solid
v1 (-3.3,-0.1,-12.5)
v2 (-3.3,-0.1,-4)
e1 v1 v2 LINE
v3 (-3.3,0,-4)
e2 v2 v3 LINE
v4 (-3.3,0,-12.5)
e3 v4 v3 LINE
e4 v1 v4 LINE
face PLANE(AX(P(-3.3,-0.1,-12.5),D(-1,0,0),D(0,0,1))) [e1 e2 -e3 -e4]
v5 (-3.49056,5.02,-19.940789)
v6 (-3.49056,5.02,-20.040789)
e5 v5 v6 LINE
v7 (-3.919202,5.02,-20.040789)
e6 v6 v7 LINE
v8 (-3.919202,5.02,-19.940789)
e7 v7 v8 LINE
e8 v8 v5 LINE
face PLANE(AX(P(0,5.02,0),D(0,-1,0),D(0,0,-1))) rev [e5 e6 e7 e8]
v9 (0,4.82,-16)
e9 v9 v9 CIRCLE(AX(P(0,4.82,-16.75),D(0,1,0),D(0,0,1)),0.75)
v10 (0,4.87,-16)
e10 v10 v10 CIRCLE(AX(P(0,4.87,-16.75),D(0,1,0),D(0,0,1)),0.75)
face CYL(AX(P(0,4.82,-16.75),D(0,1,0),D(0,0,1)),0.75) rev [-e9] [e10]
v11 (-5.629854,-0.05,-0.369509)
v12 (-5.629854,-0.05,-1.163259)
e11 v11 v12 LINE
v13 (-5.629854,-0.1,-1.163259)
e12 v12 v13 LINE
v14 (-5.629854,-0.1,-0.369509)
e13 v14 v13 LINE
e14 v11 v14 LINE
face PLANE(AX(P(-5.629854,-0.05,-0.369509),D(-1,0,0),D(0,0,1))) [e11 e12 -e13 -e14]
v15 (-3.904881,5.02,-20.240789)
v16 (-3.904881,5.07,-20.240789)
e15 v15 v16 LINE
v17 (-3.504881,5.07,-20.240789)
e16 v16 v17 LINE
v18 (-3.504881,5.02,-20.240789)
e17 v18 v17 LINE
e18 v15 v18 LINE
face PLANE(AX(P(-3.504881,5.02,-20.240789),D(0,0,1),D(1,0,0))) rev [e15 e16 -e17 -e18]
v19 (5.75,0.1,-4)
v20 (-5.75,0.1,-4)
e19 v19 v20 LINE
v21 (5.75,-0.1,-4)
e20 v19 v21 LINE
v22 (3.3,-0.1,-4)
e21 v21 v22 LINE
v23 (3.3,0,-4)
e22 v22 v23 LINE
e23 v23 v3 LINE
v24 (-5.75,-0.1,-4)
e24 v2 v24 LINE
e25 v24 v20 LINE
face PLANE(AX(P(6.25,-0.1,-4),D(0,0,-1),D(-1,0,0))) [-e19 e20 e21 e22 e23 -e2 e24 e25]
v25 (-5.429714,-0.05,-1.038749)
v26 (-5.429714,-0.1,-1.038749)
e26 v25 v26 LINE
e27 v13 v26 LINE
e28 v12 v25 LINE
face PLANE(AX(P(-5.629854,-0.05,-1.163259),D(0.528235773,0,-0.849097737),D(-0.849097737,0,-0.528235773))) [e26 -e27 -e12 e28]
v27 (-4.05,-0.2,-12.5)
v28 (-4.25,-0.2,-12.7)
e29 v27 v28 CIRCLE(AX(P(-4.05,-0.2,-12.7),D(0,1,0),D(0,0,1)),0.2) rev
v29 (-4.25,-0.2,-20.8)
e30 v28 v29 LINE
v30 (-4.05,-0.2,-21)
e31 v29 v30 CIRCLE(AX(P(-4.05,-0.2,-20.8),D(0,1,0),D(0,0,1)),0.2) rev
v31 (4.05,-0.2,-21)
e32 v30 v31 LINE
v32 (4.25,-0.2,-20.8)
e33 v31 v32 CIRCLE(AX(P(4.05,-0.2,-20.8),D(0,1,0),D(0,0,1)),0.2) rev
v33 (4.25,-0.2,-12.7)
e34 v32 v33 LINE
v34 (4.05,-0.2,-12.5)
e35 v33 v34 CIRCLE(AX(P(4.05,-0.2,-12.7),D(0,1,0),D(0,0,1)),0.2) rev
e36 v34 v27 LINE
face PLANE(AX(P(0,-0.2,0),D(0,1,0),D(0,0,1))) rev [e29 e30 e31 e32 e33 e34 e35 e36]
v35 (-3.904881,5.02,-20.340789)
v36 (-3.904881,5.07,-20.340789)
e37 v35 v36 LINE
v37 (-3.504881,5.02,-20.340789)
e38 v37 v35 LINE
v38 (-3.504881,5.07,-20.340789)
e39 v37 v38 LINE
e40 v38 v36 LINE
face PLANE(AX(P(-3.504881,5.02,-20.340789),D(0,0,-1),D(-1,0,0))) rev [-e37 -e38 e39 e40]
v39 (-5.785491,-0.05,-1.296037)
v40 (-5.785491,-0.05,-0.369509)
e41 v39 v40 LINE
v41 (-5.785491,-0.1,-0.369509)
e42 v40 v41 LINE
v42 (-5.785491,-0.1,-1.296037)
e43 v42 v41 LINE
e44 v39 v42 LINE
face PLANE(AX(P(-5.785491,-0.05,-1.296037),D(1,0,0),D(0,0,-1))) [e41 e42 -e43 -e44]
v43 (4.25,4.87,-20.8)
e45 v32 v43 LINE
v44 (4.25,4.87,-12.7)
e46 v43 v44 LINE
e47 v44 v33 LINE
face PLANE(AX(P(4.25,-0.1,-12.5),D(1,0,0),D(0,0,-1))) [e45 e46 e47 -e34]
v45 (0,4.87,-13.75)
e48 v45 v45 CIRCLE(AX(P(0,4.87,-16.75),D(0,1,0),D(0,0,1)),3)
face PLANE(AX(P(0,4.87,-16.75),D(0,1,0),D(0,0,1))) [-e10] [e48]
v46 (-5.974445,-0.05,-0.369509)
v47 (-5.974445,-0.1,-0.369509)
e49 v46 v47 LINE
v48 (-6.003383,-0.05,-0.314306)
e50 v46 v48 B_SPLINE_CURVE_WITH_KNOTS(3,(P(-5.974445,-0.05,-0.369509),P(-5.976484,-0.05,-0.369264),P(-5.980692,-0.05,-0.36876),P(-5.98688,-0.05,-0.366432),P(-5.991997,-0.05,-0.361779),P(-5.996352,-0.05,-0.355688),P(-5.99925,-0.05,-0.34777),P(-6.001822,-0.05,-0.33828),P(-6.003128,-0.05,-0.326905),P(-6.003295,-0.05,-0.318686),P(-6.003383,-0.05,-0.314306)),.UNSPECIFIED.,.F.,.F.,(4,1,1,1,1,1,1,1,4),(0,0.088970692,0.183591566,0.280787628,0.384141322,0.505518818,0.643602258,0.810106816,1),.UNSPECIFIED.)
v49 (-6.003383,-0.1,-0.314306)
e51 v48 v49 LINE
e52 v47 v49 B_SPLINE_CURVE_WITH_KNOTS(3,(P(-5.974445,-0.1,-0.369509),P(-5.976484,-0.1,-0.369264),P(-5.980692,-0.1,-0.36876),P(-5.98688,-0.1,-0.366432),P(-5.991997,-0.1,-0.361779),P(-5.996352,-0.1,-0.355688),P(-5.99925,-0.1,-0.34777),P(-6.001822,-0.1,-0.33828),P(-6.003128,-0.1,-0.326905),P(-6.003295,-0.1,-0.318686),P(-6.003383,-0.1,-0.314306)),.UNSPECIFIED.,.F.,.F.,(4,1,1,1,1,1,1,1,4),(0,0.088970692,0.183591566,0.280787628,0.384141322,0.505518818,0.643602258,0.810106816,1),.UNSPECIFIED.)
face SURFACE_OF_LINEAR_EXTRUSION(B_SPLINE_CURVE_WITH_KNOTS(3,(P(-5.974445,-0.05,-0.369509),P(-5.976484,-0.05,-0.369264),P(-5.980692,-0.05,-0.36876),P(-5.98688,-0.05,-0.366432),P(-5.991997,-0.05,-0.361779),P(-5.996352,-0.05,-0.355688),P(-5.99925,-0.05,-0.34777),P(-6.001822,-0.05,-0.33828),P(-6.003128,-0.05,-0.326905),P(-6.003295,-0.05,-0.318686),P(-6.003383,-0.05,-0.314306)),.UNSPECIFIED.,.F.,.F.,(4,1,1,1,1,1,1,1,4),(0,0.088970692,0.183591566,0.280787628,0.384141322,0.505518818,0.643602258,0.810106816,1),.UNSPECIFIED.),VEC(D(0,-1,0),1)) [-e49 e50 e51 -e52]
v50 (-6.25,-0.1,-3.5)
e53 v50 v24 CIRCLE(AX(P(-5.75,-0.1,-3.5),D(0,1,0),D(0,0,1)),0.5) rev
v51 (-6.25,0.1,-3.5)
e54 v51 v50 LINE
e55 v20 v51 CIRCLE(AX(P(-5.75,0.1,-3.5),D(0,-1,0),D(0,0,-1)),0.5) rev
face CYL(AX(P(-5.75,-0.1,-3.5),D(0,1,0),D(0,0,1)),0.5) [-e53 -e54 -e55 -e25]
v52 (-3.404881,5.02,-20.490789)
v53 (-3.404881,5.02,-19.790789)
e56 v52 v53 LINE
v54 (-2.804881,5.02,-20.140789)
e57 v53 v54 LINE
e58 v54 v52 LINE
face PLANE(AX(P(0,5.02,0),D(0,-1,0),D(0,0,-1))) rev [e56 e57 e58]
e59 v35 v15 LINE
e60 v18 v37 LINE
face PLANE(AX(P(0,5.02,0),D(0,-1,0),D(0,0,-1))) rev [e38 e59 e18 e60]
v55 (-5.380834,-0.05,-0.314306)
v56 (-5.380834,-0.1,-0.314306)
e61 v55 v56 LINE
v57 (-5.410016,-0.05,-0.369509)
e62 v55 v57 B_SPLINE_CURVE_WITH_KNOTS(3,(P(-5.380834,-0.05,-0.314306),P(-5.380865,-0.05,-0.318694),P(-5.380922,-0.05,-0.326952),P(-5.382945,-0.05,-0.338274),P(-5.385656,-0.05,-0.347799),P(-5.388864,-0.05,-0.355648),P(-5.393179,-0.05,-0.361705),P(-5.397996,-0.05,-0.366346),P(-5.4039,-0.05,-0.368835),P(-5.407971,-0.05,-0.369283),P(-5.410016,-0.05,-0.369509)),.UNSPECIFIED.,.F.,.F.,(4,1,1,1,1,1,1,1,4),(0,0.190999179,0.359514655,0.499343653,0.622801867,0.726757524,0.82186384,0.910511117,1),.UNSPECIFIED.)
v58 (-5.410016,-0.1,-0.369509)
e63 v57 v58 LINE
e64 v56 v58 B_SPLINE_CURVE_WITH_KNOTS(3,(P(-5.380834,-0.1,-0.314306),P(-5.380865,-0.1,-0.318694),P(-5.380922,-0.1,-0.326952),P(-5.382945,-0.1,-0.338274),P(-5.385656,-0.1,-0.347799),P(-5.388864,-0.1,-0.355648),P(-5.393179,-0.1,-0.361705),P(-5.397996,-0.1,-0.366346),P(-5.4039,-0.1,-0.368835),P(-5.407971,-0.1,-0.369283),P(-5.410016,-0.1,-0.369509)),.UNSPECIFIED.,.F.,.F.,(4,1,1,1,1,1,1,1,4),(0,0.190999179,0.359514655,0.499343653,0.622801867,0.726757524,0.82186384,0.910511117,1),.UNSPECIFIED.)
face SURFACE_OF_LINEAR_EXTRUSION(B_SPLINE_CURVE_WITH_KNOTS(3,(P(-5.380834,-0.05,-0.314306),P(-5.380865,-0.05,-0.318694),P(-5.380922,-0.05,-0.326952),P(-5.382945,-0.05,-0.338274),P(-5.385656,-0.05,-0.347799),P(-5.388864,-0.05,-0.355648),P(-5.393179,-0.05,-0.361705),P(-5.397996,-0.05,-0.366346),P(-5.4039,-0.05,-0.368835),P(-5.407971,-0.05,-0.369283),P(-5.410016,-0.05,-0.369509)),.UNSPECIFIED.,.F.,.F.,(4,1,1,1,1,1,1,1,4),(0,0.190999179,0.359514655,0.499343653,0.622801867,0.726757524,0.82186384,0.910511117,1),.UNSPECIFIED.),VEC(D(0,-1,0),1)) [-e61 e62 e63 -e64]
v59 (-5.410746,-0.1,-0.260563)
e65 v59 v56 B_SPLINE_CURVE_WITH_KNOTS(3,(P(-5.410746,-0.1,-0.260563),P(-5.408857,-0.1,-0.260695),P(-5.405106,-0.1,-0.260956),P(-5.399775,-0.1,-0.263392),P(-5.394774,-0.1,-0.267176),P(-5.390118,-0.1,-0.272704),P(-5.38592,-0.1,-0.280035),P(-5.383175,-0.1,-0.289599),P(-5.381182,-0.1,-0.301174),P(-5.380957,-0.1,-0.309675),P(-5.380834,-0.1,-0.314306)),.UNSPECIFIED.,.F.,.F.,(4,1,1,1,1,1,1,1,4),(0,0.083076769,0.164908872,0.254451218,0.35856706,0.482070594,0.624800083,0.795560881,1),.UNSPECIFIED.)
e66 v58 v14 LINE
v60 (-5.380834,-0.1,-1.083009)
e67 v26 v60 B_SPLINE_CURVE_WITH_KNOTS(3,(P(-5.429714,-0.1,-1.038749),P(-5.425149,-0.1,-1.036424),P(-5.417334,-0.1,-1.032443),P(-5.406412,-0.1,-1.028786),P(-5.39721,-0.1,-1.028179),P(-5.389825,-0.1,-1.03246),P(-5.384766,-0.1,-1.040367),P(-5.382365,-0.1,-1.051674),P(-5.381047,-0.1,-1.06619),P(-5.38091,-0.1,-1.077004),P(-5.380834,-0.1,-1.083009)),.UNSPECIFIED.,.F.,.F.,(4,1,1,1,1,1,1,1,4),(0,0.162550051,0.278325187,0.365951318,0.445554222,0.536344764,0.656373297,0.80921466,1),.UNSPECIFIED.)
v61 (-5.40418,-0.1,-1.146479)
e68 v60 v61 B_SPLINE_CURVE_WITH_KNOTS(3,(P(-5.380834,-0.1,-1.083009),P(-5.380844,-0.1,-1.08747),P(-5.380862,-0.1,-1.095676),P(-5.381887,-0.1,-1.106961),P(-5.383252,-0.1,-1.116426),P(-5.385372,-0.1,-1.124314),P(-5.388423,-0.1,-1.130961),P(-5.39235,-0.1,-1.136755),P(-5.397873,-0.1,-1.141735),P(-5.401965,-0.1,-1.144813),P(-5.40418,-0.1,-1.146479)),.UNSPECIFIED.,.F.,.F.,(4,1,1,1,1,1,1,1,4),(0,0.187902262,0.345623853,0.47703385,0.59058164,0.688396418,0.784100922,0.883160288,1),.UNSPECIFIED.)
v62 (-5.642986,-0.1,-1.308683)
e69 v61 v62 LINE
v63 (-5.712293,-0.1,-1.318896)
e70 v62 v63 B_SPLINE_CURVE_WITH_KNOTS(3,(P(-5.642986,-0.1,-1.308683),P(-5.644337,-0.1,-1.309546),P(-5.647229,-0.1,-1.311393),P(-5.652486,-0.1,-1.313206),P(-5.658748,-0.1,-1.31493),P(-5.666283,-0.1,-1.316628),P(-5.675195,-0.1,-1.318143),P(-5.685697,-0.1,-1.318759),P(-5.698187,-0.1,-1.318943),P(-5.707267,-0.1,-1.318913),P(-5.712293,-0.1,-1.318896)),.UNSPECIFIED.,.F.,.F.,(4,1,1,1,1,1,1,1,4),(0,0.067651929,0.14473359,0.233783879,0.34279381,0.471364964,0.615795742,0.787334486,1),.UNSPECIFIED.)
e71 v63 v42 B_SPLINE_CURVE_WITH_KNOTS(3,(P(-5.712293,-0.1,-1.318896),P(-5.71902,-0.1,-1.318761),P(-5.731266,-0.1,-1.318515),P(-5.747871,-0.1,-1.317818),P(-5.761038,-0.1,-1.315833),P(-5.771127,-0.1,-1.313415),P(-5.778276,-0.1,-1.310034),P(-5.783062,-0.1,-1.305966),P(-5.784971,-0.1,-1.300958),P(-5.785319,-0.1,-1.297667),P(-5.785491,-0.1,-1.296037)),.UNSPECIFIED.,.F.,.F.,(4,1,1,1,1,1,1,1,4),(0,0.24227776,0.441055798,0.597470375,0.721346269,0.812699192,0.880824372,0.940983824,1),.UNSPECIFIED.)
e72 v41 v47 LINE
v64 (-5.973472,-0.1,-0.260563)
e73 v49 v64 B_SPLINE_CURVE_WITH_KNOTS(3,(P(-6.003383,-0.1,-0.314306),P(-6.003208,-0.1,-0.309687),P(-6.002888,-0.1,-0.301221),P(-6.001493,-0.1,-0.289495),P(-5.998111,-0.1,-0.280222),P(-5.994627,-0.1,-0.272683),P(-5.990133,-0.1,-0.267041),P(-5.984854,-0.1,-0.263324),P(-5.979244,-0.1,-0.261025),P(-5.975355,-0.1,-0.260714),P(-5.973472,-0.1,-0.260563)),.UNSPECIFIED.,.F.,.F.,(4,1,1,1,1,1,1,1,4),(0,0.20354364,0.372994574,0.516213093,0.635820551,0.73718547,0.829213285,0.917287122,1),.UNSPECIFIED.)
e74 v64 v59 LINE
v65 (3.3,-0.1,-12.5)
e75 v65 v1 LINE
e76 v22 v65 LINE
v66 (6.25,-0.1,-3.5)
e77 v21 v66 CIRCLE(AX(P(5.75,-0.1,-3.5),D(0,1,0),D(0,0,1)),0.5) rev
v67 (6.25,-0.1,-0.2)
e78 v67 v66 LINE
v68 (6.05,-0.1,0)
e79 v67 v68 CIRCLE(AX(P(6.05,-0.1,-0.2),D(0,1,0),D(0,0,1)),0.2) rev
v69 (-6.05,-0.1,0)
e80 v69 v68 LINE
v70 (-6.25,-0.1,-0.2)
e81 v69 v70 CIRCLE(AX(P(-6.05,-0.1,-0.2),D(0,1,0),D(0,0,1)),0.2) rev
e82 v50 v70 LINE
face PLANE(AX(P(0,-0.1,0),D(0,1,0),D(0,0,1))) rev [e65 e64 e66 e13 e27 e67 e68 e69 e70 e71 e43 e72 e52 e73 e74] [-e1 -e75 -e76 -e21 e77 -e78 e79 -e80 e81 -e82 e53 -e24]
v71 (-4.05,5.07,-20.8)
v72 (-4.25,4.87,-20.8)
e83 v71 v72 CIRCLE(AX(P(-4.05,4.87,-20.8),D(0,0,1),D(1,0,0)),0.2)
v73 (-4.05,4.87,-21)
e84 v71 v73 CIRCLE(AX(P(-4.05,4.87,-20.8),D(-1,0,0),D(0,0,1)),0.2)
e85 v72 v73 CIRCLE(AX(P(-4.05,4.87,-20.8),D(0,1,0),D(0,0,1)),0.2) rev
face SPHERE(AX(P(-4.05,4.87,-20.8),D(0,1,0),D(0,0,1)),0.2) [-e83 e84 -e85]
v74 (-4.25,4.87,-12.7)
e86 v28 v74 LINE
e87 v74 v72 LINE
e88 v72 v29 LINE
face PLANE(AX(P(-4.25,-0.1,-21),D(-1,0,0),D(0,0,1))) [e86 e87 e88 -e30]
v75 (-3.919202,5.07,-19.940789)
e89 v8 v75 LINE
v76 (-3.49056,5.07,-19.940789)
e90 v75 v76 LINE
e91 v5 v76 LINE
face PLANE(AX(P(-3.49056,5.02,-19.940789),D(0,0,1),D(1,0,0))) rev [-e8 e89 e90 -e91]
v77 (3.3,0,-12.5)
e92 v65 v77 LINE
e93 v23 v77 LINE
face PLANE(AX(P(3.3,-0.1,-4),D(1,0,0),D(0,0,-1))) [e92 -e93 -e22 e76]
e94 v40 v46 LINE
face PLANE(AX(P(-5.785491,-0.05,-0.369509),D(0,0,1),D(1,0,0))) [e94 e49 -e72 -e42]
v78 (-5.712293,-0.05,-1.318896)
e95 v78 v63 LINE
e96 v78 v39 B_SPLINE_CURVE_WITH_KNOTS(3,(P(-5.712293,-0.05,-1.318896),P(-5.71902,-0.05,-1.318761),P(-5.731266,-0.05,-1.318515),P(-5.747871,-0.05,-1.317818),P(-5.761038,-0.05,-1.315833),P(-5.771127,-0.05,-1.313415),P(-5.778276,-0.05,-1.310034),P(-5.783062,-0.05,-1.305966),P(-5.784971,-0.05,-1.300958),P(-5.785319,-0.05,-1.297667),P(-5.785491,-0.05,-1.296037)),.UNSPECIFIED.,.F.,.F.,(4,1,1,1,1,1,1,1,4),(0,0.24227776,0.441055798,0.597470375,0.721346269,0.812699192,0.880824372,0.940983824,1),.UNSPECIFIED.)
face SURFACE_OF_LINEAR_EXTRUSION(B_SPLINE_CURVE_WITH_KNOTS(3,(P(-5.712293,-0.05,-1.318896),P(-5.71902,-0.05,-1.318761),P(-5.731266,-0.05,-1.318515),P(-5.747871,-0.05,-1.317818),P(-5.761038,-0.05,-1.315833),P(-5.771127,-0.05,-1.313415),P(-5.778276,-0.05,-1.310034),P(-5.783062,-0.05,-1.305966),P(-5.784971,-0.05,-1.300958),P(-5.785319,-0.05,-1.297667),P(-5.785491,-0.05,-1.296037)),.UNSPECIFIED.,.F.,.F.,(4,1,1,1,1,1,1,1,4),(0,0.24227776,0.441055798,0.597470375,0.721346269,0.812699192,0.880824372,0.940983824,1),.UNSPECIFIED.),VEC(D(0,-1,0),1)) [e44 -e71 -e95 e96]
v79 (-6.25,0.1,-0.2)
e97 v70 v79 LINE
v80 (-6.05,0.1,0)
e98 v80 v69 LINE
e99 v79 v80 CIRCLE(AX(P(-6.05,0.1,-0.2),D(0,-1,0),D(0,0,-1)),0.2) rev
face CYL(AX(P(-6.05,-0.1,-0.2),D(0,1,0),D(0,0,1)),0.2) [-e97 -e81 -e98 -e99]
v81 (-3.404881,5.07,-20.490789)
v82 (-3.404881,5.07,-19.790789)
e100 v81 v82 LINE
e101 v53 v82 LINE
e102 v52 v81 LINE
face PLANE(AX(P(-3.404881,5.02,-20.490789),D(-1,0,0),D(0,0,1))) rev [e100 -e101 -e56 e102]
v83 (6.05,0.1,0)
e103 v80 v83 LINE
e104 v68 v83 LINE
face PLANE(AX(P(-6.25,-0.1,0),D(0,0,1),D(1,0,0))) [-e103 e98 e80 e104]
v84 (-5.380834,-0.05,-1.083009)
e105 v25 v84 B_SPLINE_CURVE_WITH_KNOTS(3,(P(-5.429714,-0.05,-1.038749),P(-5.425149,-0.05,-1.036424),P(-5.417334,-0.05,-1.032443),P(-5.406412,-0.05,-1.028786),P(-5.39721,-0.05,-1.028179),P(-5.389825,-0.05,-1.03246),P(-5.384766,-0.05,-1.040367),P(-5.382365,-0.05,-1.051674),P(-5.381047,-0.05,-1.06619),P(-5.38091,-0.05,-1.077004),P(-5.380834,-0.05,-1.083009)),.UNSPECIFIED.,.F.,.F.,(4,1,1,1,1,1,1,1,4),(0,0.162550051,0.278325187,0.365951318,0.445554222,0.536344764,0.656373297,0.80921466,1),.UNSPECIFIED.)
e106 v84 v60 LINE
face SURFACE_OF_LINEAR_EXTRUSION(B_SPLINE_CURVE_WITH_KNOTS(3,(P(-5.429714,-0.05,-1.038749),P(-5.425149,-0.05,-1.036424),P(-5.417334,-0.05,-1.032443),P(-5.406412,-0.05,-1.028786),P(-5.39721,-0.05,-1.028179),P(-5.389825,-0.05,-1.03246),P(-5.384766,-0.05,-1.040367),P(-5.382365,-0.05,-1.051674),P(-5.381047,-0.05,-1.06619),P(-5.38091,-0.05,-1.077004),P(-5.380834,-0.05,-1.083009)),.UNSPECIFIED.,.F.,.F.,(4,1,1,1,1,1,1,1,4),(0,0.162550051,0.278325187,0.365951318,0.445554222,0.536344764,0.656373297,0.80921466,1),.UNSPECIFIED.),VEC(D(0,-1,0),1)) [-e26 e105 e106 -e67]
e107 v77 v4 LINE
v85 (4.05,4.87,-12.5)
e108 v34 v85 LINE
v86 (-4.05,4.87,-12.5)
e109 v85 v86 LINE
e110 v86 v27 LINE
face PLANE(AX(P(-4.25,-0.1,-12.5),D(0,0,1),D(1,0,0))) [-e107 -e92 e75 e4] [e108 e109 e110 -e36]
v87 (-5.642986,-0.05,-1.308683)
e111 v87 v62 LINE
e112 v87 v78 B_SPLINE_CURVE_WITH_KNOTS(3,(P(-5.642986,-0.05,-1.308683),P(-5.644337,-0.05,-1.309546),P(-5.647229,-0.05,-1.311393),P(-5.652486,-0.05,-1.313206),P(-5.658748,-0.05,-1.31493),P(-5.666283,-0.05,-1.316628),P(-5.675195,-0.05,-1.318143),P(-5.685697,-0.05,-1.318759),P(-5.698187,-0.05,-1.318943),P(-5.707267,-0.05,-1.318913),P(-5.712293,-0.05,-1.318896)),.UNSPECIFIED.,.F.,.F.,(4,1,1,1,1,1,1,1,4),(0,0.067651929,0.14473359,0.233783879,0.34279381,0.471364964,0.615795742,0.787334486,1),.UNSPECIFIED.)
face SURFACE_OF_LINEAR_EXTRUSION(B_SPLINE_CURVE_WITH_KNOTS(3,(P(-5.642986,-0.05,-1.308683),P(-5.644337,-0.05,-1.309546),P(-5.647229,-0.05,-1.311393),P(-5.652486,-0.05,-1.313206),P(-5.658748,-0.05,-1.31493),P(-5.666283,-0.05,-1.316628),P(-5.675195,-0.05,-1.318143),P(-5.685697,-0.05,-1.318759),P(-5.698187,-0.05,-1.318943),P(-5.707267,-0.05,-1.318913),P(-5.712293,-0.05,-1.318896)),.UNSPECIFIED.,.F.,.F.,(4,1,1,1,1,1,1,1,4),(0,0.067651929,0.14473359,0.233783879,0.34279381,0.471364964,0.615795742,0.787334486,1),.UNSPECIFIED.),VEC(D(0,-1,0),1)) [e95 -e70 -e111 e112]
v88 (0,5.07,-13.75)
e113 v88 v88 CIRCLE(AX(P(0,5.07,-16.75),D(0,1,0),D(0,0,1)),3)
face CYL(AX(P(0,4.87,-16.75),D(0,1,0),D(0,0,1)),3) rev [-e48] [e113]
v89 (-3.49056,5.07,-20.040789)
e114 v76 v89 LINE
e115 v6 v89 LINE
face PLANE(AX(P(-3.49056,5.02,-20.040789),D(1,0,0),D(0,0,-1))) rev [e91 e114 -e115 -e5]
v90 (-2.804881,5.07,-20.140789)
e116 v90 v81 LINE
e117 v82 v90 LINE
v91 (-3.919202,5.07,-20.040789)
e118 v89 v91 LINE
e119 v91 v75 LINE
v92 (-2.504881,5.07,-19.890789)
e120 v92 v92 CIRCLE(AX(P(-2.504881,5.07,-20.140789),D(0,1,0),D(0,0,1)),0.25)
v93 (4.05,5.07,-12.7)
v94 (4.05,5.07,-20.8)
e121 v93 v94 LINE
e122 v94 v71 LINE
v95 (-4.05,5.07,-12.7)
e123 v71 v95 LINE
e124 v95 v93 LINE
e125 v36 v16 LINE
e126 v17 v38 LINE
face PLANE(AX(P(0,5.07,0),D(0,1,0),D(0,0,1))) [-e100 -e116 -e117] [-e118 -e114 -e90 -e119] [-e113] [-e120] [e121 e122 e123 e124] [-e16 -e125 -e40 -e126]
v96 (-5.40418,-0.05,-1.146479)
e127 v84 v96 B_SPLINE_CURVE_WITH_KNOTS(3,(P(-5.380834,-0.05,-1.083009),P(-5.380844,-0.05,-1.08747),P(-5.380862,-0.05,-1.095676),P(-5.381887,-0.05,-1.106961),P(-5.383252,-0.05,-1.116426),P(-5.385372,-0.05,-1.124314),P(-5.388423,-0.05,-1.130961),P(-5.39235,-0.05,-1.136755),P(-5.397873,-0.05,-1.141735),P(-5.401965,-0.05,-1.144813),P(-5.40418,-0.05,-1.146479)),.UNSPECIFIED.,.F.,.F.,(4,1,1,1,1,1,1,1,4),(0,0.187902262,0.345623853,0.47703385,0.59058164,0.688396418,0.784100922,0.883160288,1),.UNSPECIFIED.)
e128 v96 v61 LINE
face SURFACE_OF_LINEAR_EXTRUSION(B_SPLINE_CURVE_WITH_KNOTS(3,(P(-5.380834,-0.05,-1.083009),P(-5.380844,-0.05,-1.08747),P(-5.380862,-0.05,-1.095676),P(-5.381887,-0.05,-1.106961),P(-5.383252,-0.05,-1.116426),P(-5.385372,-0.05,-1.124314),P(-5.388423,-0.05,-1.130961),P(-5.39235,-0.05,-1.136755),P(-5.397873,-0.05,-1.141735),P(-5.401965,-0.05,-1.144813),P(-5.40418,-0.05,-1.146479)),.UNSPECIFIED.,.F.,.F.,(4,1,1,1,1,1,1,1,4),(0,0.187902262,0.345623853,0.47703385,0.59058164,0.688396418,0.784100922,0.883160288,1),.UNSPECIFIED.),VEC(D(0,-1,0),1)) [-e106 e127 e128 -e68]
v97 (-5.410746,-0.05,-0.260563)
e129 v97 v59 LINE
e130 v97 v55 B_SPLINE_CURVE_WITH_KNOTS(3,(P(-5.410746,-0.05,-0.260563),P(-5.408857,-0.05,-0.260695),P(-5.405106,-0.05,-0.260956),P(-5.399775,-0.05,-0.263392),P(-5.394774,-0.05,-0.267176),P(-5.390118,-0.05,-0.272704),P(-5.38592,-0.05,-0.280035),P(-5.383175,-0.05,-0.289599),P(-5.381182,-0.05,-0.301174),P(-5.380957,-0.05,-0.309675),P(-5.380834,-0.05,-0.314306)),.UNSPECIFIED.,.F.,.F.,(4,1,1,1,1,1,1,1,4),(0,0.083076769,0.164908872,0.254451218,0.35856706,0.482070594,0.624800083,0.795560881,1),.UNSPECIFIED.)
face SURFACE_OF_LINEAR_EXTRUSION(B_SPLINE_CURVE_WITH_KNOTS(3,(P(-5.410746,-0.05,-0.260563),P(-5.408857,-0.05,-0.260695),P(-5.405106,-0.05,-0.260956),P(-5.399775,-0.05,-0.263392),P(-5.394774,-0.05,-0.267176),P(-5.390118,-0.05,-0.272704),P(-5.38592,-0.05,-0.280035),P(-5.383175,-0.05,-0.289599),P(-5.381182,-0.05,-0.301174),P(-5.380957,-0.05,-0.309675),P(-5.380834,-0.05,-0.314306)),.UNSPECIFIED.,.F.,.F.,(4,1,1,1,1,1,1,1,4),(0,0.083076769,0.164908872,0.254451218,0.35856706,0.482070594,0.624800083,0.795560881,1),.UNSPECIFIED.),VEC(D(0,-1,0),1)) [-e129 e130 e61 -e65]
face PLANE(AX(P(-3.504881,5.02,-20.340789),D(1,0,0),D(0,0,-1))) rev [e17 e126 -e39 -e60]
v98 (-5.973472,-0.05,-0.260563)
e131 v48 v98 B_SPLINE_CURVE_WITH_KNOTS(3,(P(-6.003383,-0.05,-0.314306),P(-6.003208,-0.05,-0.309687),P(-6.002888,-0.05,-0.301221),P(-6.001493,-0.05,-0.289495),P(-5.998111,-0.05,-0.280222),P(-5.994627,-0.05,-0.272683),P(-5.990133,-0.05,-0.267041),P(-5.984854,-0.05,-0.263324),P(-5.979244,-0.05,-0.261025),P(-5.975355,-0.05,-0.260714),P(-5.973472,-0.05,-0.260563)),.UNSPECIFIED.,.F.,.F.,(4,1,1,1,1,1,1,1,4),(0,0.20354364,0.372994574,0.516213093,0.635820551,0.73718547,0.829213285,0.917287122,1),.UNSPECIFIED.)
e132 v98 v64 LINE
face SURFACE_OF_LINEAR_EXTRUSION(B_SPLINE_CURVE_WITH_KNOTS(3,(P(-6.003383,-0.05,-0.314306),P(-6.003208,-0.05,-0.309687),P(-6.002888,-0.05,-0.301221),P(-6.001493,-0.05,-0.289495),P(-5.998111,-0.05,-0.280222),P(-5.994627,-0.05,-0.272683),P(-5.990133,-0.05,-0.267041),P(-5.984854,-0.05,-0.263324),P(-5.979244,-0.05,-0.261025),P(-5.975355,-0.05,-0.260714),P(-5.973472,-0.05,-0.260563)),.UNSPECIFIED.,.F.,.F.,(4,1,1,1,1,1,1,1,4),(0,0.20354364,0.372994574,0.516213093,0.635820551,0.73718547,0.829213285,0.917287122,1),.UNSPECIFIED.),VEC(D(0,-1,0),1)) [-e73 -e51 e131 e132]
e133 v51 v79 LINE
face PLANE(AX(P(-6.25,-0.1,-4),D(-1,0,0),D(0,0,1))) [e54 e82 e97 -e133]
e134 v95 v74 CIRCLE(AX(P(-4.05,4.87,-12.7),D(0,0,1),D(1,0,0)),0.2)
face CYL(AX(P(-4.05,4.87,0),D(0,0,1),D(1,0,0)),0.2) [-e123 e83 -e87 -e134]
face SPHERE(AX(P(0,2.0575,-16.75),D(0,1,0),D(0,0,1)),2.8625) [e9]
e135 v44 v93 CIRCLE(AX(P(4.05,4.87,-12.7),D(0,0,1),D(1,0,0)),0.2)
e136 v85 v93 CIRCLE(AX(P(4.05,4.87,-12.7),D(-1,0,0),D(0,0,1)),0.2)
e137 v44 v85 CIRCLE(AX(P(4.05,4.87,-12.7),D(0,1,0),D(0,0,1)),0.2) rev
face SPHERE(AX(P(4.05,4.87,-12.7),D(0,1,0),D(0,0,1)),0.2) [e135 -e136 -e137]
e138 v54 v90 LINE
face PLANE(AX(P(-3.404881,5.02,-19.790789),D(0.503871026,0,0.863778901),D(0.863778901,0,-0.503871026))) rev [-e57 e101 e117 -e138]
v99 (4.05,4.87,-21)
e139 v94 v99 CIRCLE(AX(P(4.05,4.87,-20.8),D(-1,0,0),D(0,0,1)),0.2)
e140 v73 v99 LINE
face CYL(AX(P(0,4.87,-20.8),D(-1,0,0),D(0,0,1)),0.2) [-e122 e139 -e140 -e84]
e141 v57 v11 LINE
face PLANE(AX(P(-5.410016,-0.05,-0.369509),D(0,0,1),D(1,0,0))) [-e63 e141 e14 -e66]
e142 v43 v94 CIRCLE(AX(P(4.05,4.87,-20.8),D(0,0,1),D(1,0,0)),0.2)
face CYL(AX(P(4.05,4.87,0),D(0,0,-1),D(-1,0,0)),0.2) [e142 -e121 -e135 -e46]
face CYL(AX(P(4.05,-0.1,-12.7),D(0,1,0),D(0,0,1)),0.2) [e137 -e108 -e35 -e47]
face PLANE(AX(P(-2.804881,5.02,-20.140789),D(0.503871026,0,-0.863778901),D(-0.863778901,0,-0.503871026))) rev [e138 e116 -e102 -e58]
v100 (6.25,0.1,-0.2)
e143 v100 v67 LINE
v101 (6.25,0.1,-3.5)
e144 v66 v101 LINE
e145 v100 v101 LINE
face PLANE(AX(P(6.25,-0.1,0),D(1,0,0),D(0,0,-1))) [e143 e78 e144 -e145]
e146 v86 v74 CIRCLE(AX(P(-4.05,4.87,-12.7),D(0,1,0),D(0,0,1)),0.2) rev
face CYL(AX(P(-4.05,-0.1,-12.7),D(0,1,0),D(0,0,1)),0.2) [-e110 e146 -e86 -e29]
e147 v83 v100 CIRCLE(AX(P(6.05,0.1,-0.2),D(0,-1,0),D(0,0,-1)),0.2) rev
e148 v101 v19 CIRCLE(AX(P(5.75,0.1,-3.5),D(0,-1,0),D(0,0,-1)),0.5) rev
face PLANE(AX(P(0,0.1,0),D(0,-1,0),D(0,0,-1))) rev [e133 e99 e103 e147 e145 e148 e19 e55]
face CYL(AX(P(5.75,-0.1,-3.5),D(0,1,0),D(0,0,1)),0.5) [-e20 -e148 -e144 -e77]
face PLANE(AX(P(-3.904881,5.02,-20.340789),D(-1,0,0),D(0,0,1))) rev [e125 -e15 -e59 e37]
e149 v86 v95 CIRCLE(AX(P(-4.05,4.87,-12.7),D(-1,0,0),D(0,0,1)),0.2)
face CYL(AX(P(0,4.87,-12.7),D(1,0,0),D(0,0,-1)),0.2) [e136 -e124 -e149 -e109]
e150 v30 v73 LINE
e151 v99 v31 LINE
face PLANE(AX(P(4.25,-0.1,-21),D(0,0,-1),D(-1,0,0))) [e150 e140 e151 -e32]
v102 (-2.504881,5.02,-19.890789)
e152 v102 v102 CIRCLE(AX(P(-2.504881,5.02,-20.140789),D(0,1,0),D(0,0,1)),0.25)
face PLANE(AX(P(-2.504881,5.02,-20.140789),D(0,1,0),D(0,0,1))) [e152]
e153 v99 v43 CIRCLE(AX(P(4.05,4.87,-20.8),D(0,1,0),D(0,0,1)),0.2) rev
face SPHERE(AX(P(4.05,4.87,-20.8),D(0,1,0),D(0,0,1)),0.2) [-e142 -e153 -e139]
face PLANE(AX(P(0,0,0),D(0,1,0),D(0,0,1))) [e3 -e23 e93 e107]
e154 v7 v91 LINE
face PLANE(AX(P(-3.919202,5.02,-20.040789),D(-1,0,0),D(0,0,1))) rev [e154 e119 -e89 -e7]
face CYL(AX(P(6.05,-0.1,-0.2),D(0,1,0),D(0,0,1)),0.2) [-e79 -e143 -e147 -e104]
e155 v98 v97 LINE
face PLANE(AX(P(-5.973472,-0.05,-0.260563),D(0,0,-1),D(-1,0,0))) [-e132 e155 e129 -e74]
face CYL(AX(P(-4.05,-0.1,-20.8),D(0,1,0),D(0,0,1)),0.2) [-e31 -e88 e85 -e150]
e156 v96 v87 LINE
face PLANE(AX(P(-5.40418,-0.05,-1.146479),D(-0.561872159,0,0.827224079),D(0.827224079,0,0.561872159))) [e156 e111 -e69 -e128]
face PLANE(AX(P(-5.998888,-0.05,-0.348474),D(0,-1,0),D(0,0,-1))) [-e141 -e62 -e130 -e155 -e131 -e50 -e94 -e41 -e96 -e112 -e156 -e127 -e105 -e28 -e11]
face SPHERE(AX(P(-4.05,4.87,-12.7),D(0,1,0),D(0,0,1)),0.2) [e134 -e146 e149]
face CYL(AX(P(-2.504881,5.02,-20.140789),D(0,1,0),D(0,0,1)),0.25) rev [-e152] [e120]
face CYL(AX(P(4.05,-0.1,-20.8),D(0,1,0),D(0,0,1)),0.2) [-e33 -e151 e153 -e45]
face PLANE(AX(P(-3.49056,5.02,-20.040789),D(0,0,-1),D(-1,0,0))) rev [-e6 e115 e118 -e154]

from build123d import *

# Parameters (mm, degrees)
SM_BASE_FLANGE_1_DEPTH = 0.1
SKETCH_6_W             = 12.5
SKETCH_6_H             = 4
EXTRUDE_1_DEPTH        = 0.1
SKETCH_7_W             = 8.5
SKETCH_7_H             = 8.5
EXTRUDE_2_DEPTH        = 0.1
SKETCH_8_W             = 8.5
SKETCH_8_H             = 8.5
EXTRUDE_3_DEPTH        = 5.07
SKETCH_9_R             = 3
CUT_EXTRUDE_1_DEPTH    = 0.2
FILLET_2_R             = 0.5
FILLET_3_R             = 0.2
SKETCH_11_R            = 0.25
SKETCH_11_W            = 0.4
SKETCH_11_H            = 0.1
SKETCH_11_W_2          = 0.428641975
CUT_EXTRUDE_2_DEPTH    = 0.05
FILLET_4_R             = 0.2
FILLET_5_R             = 0.2
SKETCH_13_R            = 0.75
CUT_EXTRUDE_3_DEPTH    = 0.05
DOME_1_FACE_RADIUS     = 0.75
DOME_1_HEIGHT          = 0.1
CUT_EXTRUDE_4_DEPTH    = 0.05


# Sheet-metal steps are written as plain solids
with BuildPart() as part:
    # Sketch 1 → Базовая кромка1 (new body)
    with BuildSketch(Plane(origin=(0, 0, 0), x_dir=(1, 0, 0), z_dir=(0, 1, 0))):
        Polygon((-6.25, 4), (-6.25, 0), (6.25, 0), (6.25, 4), (3.3, 4), (3.3, 12.5), (4.25, 12.5), (4.25, 21), (-4.25, 21), (-4.25, 12.5), (-3.3, 12.5), (-3.3, 4), align=None)
    extrude(amount=-SM_BASE_FLANGE_1_DEPTH)

    # Эскиз6 → Бобышка-Вытянуть1 (add)
    with BuildSketch(Plane(origin=(0, 0, 0), x_dir=(1, 0, 0), z_dir=(0, 1, 0))):
        with Locations((0, 2)):
            Rectangle(SKETCH_6_W, SKETCH_6_H)
    extrude(amount=EXTRUDE_1_DEPTH)

    # Эскиз7 → Бобышка-Вытянуть2 (add)
    with BuildSketch(Plane.XZ.offset(0.1)):
        with Locations((0, -16.75)):
            Rectangle(SKETCH_7_W, SKETCH_7_H)
    extrude(amount=EXTRUDE_2_DEPTH)

    # Эскиз8 → Бобышка-Вытянуть3 (add)
    with BuildSketch(Plane(origin=(0, 0, 0), x_dir=(1, 0, 0), z_dir=(0, 1, 0))):
        with Locations((0, 16.75)):
            Rectangle(SKETCH_8_W, SKETCH_8_H)
    extrude(amount=EXTRUDE_3_DEPTH)

    # Эскиз9 → Вырез-Вытянуть1 (cut)
    with BuildSketch(Plane(origin=(0, 5.07, 0), x_dir=(1, 0, 0), z_dir=(0, 1, 0))):
        with Locations(Location((0, 16.75, 0), (0, 0, 270))):
            Circle(SKETCH_9_R)
    extrude(amount=-CUT_EXTRUDE_1_DEPTH, mode=Mode.SUBTRACT)

    # Скругление2
    fillet_2_edges = [part.edges().sort_by_distance(p)[0] for p in [
        (6.25, 0, -4),
        (-6.25, 0, -4),
    ]]
    fillet(fillet_2_edges, radius=FILLET_2_R)

    # Скругление3
    fillet_3_edges = [part.edges().sort_by_distance(p)[0] for p in [
        (6.25, 0, 0),
        (-6.25, 0, 0),
    ]]
    fillet(fillet_3_edges, radius=FILLET_3_R)

    # Эскиз11 → Вырез-Вытянуть2 (cut)
    with BuildSketch(Plane(origin=(0, 5.07, 0), x_dir=(1, 0, 0), z_dir=(0, 1, 0))):
        with Locations(Location((-2.504881476, 20.140788589, 0), (0, 0, 270))):
            Circle(SKETCH_11_R)
        Polygon((-3.404881476, 20.490788589), (-3.404881476, 19.790788589), (-2.804881476, 20.140788589), align=None)
        with Locations((-3.704881476, 20.290788589)):
            Rectangle(SKETCH_11_W, SKETCH_11_H)
        with Locations((-3.704881477, 19.990788589)):
            Rectangle(SKETCH_11_W_2, SKETCH_11_H)
    extrude(amount=-CUT_EXTRUDE_2_DEPTH, mode=Mode.SUBTRACT)

    # Скругление4
    fillet_4_edges = [part.edges().sort_by_distance(p)[0] for p in [
        (-4.25, 2.435, -12.5),
        (-4.25, 2.435, -21),
        (4.25, 2.435, -21),
        (4.25, 2.435, -12.5),
    ]]
    fillet(fillet_4_edges, radius=FILLET_4_R)

    # Скругление5
    fillet_5_edges = [part.edges().sort_by_distance(p)[0] for p in [
        (0, 5.07, -21),
        (-4.25, 5.07, -16.75),
        (0, 5.07, -12.5),
        (4.25, 5.07, -16.75),
        (4.191421356, 5.07, -12.558578644),
        (-4.191421356, 5.07, -12.558578644),
        (4.191421356, 5.07, -20.941421356),
        (-4.191421356, 5.07, -20.941421356),
    ]]
    fillet(fillet_5_edges, radius=FILLET_5_R)

    # Эскиз13 → Вырез-Вытянуть3 (cut)
    with BuildSketch(Plane(origin=(0, 4.87, 0), x_dir=(1, 0, 0), z_dir=(0, 1, 0))):
        with Locations(Location((0, 16.75, 0), (0, 0, 270))):
            Circle(SKETCH_13_R)
    extrude(amount=-CUT_EXTRUDE_3_DEPTH, mode=Mode.SUBTRACT)

    # Купол1: a dome of height H over a round flat face of radius A is a cap of a sphere of radius (A * A + H * H) / (2 * H)
    dome_1_r = (DOME_1_FACE_RADIUS * DOME_1_FACE_RADIUS + DOME_1_HEIGHT * DOME_1_HEIGHT) / (2 * DOME_1_HEIGHT)
    dome_1_base = Plane((0, 4.82, -16.75), z_dir=(0, 1, 0))
    with Locations(dome_1_base.offset(DOME_1_HEIGHT - dome_1_r)):
        dome_1_ball = Sphere(dome_1_r, mode=Mode.PRIVATE)
    add(split(dome_1_ball, bisect_by=dome_1_base, keep=Keep.TOP, mode=Mode.PRIVATE))

    # Эскиз14 → Вырез-Вытянуть4 (cut)
    with BuildSketch(Plane.XZ.offset(0.1)):
        with BuildLine():
            add(Edge.make_bspline(
                [(-6.003383397, -0.314306436), (-6.003208457, -0.309686598), (-6.002887878, -0.301220725), (-6.001492735, -0.289495252), (-5.998110788, -0.280222293), (-5.994627409, -0.272683421), (-5.990132541, -0.267041234), (-5.984854454, -0.263323548), (-5.979244173, -0.261024904), (-5.975355275, -0.260713676), (-5.973471862, -0.260562946)],
                knots=[0, 0, 0, 0, 1.628349121, 2.98395659, 4.129704748, 5.086564407, 5.897483759, 6.63370628, 7.338296972, 8, 8, 8, 8], degree=3))
            Line((-5.973471862, -0.260562946), (-5.410745912, -0.260562946))
            add(Edge.make_bspline(
                [(-5.410745912, -0.260562946), (-5.40885651, -0.260694679), (-5.405106012, -0.26095617), (-5.399775012, -0.263392441), (-5.394773829, -0.267176005), (-5.390117693, -0.272704247), (-5.385920232, -0.280035282), (-5.383175234, -0.289598664), (-5.381181748, -0.301173725), (-5.380956895, -0.309674519), (-5.380834377, -0.314306436)],
                knots=[0, 0, 0, 0, 0.664614152, 1.319270975, 2.035609743, 2.868536476, 3.856564754, 4.99840066, 6.364487051, 8, 8, 8, 8], degree=3))
            add(Edge.make_bspline(
                [(-5.380834377, -0.314306436), (-5.380864917, -0.318693721), (-5.380922402, -0.326951838), (-5.382944792, -0.338274401), (-5.385655893, -0.347798587), (-5.388864391, -0.35564771), (-5.393178768, -0.361704746), (-5.397996026, -0.366346051), (-5.403899926, -0.368834535), (-5.407971139, -0.369283488), (-5.410016362, -0.369509025)],
                knots=[0, 0, 0, 0, 1.527993431, 2.876117242, 3.994749226, 4.982414938, 5.814060196, 6.574910721, 7.284088933, 8, 8, 8, 8], degree=3))
            Line((-5.410016362, -0.369509025), (-5.629853985, -0.369509025))
            Line((-5.629853985, -0.369509025), (-5.629853985, -1.163259025))
            Line((-5.629853985, -1.163259025), (-5.429714202, -1.038749221))
            add(Edge.make_bspline(
                [(-5.429714202, -1.038749221), (-5.425149481, -1.036424176), (-5.417333568, -1.032443135), (-5.40641212, -1.02878606), (-5.397209622, -1.028178755), (-5.389825008, -1.032459821), (-5.384765717, -1.040366747), (-5.38236471, -1.05167421), (-5.38104661, -1.066189675), (-5.380910144, -1.077004214), (-5.380834377, -1.083008565)],
                knots=[0, 0, 0, 0, 1.300400407, 2.226601497, 2.927610547, 3.564433773, 4.290758113, 5.250986372, 6.473717283, 8, 8, 8, 8], degree=3))
            add(Edge.make_bspline(
                [(-5.380834377, -1.083008565), (-5.380843974, -1.08746989), (-5.380861627, -1.095675966), (-5.381887136, -1.106960532), (-5.38325169, -1.116425903), (-5.385371952, -1.124314191), (-5.388422962, -1.13096114), (-5.392349709, -1.136754986), (-5.397873467, -1.141735037), (-5.401965467, -1.144813428), (-5.404179965, -1.146479383)],
                knots=[0, 0, 0, 0, 1.503218099, 2.764990822, 3.816270798, 4.724653119, 5.507171343, 6.272807373, 7.065282303, 8, 8, 8, 8], degree=3))
            Line((-5.404179965, -1.146479383), (-5.642985878, -1.308682585))
            add(Edge.make_bspline(
                [(-5.642985878, -1.308682585), (-5.644337471, -1.309545988), (-5.647229049, -1.311393143), (-5.652486271, -1.313205889), (-5.658748264, -1.314930023), (-5.666283445, -1.316627774), (-5.675194902, -1.318142504), (-5.685696762, -1.318759354), (-5.698186972, -1.318943259), (-5.707267063, -1.318913018), (-5.712293093, -1.318896279)],
                knots=[0, 0, 0, 0, 0.541215428, 1.157868723, 1.870271028, 2.742350482, 3.770919716, 4.926365934, 6.298675888, 8, 8, 8, 8], degree=3))
            add(Edge.make_bspline(
                [(-5.712293093, -1.318896279), (-5.719020011, -1.318761234), (-5.731266064, -1.318515389), (-5.747870516, -1.317817694), (-5.761037615, -1.315832622), (-5.771126699, -1.313415241), (-5.77827598, -1.310034132), (-5.783062441, -1.30596597), (-5.784970741, -1.30095795), (-5.785318853, -1.297666831), (-5.78549124, -1.296037058)],
                knots=[0, 0, 0, 0, 1.938222078, 3.528446385, 4.779762996, 5.770770152, 6.501593536, 7.046594974, 7.527870594, 8, 8, 8, 8], degree=3))
            Line((-5.78549124, -1.296037058), (-5.78549124, -0.369509025))
            Line((-5.78549124, -0.369509025), (-5.974444595, -0.369509025))
            add(Edge.make_bspline(
                [(-5.974444595, -0.369509025), (-5.976483759, -0.369264404), (-5.980691588, -0.368759627), (-5.986880194, -0.366432009), (-5.991996556, -0.361778766), (-5.996351899, -0.35568764), (-5.99925034, -0.347770297), (-6.001822213, -0.338280185), (-6.003127762, -0.326904664), (-6.003294537, -0.318685637), (-6.003383397, -0.314306436)],
                knots=[0, 0, 0, 0, 0.711765533, 1.468732524, 2.24630102, 3.073130576, 4.044150543, 5.148818068, 6.480854525, 8, 8, 8, 8], degree=3))
        make_face()
    extrude(amount=-CUT_EXTRUDE_4_DEPTH, mode=Mode.SUBTRACT)


solid = part.part
